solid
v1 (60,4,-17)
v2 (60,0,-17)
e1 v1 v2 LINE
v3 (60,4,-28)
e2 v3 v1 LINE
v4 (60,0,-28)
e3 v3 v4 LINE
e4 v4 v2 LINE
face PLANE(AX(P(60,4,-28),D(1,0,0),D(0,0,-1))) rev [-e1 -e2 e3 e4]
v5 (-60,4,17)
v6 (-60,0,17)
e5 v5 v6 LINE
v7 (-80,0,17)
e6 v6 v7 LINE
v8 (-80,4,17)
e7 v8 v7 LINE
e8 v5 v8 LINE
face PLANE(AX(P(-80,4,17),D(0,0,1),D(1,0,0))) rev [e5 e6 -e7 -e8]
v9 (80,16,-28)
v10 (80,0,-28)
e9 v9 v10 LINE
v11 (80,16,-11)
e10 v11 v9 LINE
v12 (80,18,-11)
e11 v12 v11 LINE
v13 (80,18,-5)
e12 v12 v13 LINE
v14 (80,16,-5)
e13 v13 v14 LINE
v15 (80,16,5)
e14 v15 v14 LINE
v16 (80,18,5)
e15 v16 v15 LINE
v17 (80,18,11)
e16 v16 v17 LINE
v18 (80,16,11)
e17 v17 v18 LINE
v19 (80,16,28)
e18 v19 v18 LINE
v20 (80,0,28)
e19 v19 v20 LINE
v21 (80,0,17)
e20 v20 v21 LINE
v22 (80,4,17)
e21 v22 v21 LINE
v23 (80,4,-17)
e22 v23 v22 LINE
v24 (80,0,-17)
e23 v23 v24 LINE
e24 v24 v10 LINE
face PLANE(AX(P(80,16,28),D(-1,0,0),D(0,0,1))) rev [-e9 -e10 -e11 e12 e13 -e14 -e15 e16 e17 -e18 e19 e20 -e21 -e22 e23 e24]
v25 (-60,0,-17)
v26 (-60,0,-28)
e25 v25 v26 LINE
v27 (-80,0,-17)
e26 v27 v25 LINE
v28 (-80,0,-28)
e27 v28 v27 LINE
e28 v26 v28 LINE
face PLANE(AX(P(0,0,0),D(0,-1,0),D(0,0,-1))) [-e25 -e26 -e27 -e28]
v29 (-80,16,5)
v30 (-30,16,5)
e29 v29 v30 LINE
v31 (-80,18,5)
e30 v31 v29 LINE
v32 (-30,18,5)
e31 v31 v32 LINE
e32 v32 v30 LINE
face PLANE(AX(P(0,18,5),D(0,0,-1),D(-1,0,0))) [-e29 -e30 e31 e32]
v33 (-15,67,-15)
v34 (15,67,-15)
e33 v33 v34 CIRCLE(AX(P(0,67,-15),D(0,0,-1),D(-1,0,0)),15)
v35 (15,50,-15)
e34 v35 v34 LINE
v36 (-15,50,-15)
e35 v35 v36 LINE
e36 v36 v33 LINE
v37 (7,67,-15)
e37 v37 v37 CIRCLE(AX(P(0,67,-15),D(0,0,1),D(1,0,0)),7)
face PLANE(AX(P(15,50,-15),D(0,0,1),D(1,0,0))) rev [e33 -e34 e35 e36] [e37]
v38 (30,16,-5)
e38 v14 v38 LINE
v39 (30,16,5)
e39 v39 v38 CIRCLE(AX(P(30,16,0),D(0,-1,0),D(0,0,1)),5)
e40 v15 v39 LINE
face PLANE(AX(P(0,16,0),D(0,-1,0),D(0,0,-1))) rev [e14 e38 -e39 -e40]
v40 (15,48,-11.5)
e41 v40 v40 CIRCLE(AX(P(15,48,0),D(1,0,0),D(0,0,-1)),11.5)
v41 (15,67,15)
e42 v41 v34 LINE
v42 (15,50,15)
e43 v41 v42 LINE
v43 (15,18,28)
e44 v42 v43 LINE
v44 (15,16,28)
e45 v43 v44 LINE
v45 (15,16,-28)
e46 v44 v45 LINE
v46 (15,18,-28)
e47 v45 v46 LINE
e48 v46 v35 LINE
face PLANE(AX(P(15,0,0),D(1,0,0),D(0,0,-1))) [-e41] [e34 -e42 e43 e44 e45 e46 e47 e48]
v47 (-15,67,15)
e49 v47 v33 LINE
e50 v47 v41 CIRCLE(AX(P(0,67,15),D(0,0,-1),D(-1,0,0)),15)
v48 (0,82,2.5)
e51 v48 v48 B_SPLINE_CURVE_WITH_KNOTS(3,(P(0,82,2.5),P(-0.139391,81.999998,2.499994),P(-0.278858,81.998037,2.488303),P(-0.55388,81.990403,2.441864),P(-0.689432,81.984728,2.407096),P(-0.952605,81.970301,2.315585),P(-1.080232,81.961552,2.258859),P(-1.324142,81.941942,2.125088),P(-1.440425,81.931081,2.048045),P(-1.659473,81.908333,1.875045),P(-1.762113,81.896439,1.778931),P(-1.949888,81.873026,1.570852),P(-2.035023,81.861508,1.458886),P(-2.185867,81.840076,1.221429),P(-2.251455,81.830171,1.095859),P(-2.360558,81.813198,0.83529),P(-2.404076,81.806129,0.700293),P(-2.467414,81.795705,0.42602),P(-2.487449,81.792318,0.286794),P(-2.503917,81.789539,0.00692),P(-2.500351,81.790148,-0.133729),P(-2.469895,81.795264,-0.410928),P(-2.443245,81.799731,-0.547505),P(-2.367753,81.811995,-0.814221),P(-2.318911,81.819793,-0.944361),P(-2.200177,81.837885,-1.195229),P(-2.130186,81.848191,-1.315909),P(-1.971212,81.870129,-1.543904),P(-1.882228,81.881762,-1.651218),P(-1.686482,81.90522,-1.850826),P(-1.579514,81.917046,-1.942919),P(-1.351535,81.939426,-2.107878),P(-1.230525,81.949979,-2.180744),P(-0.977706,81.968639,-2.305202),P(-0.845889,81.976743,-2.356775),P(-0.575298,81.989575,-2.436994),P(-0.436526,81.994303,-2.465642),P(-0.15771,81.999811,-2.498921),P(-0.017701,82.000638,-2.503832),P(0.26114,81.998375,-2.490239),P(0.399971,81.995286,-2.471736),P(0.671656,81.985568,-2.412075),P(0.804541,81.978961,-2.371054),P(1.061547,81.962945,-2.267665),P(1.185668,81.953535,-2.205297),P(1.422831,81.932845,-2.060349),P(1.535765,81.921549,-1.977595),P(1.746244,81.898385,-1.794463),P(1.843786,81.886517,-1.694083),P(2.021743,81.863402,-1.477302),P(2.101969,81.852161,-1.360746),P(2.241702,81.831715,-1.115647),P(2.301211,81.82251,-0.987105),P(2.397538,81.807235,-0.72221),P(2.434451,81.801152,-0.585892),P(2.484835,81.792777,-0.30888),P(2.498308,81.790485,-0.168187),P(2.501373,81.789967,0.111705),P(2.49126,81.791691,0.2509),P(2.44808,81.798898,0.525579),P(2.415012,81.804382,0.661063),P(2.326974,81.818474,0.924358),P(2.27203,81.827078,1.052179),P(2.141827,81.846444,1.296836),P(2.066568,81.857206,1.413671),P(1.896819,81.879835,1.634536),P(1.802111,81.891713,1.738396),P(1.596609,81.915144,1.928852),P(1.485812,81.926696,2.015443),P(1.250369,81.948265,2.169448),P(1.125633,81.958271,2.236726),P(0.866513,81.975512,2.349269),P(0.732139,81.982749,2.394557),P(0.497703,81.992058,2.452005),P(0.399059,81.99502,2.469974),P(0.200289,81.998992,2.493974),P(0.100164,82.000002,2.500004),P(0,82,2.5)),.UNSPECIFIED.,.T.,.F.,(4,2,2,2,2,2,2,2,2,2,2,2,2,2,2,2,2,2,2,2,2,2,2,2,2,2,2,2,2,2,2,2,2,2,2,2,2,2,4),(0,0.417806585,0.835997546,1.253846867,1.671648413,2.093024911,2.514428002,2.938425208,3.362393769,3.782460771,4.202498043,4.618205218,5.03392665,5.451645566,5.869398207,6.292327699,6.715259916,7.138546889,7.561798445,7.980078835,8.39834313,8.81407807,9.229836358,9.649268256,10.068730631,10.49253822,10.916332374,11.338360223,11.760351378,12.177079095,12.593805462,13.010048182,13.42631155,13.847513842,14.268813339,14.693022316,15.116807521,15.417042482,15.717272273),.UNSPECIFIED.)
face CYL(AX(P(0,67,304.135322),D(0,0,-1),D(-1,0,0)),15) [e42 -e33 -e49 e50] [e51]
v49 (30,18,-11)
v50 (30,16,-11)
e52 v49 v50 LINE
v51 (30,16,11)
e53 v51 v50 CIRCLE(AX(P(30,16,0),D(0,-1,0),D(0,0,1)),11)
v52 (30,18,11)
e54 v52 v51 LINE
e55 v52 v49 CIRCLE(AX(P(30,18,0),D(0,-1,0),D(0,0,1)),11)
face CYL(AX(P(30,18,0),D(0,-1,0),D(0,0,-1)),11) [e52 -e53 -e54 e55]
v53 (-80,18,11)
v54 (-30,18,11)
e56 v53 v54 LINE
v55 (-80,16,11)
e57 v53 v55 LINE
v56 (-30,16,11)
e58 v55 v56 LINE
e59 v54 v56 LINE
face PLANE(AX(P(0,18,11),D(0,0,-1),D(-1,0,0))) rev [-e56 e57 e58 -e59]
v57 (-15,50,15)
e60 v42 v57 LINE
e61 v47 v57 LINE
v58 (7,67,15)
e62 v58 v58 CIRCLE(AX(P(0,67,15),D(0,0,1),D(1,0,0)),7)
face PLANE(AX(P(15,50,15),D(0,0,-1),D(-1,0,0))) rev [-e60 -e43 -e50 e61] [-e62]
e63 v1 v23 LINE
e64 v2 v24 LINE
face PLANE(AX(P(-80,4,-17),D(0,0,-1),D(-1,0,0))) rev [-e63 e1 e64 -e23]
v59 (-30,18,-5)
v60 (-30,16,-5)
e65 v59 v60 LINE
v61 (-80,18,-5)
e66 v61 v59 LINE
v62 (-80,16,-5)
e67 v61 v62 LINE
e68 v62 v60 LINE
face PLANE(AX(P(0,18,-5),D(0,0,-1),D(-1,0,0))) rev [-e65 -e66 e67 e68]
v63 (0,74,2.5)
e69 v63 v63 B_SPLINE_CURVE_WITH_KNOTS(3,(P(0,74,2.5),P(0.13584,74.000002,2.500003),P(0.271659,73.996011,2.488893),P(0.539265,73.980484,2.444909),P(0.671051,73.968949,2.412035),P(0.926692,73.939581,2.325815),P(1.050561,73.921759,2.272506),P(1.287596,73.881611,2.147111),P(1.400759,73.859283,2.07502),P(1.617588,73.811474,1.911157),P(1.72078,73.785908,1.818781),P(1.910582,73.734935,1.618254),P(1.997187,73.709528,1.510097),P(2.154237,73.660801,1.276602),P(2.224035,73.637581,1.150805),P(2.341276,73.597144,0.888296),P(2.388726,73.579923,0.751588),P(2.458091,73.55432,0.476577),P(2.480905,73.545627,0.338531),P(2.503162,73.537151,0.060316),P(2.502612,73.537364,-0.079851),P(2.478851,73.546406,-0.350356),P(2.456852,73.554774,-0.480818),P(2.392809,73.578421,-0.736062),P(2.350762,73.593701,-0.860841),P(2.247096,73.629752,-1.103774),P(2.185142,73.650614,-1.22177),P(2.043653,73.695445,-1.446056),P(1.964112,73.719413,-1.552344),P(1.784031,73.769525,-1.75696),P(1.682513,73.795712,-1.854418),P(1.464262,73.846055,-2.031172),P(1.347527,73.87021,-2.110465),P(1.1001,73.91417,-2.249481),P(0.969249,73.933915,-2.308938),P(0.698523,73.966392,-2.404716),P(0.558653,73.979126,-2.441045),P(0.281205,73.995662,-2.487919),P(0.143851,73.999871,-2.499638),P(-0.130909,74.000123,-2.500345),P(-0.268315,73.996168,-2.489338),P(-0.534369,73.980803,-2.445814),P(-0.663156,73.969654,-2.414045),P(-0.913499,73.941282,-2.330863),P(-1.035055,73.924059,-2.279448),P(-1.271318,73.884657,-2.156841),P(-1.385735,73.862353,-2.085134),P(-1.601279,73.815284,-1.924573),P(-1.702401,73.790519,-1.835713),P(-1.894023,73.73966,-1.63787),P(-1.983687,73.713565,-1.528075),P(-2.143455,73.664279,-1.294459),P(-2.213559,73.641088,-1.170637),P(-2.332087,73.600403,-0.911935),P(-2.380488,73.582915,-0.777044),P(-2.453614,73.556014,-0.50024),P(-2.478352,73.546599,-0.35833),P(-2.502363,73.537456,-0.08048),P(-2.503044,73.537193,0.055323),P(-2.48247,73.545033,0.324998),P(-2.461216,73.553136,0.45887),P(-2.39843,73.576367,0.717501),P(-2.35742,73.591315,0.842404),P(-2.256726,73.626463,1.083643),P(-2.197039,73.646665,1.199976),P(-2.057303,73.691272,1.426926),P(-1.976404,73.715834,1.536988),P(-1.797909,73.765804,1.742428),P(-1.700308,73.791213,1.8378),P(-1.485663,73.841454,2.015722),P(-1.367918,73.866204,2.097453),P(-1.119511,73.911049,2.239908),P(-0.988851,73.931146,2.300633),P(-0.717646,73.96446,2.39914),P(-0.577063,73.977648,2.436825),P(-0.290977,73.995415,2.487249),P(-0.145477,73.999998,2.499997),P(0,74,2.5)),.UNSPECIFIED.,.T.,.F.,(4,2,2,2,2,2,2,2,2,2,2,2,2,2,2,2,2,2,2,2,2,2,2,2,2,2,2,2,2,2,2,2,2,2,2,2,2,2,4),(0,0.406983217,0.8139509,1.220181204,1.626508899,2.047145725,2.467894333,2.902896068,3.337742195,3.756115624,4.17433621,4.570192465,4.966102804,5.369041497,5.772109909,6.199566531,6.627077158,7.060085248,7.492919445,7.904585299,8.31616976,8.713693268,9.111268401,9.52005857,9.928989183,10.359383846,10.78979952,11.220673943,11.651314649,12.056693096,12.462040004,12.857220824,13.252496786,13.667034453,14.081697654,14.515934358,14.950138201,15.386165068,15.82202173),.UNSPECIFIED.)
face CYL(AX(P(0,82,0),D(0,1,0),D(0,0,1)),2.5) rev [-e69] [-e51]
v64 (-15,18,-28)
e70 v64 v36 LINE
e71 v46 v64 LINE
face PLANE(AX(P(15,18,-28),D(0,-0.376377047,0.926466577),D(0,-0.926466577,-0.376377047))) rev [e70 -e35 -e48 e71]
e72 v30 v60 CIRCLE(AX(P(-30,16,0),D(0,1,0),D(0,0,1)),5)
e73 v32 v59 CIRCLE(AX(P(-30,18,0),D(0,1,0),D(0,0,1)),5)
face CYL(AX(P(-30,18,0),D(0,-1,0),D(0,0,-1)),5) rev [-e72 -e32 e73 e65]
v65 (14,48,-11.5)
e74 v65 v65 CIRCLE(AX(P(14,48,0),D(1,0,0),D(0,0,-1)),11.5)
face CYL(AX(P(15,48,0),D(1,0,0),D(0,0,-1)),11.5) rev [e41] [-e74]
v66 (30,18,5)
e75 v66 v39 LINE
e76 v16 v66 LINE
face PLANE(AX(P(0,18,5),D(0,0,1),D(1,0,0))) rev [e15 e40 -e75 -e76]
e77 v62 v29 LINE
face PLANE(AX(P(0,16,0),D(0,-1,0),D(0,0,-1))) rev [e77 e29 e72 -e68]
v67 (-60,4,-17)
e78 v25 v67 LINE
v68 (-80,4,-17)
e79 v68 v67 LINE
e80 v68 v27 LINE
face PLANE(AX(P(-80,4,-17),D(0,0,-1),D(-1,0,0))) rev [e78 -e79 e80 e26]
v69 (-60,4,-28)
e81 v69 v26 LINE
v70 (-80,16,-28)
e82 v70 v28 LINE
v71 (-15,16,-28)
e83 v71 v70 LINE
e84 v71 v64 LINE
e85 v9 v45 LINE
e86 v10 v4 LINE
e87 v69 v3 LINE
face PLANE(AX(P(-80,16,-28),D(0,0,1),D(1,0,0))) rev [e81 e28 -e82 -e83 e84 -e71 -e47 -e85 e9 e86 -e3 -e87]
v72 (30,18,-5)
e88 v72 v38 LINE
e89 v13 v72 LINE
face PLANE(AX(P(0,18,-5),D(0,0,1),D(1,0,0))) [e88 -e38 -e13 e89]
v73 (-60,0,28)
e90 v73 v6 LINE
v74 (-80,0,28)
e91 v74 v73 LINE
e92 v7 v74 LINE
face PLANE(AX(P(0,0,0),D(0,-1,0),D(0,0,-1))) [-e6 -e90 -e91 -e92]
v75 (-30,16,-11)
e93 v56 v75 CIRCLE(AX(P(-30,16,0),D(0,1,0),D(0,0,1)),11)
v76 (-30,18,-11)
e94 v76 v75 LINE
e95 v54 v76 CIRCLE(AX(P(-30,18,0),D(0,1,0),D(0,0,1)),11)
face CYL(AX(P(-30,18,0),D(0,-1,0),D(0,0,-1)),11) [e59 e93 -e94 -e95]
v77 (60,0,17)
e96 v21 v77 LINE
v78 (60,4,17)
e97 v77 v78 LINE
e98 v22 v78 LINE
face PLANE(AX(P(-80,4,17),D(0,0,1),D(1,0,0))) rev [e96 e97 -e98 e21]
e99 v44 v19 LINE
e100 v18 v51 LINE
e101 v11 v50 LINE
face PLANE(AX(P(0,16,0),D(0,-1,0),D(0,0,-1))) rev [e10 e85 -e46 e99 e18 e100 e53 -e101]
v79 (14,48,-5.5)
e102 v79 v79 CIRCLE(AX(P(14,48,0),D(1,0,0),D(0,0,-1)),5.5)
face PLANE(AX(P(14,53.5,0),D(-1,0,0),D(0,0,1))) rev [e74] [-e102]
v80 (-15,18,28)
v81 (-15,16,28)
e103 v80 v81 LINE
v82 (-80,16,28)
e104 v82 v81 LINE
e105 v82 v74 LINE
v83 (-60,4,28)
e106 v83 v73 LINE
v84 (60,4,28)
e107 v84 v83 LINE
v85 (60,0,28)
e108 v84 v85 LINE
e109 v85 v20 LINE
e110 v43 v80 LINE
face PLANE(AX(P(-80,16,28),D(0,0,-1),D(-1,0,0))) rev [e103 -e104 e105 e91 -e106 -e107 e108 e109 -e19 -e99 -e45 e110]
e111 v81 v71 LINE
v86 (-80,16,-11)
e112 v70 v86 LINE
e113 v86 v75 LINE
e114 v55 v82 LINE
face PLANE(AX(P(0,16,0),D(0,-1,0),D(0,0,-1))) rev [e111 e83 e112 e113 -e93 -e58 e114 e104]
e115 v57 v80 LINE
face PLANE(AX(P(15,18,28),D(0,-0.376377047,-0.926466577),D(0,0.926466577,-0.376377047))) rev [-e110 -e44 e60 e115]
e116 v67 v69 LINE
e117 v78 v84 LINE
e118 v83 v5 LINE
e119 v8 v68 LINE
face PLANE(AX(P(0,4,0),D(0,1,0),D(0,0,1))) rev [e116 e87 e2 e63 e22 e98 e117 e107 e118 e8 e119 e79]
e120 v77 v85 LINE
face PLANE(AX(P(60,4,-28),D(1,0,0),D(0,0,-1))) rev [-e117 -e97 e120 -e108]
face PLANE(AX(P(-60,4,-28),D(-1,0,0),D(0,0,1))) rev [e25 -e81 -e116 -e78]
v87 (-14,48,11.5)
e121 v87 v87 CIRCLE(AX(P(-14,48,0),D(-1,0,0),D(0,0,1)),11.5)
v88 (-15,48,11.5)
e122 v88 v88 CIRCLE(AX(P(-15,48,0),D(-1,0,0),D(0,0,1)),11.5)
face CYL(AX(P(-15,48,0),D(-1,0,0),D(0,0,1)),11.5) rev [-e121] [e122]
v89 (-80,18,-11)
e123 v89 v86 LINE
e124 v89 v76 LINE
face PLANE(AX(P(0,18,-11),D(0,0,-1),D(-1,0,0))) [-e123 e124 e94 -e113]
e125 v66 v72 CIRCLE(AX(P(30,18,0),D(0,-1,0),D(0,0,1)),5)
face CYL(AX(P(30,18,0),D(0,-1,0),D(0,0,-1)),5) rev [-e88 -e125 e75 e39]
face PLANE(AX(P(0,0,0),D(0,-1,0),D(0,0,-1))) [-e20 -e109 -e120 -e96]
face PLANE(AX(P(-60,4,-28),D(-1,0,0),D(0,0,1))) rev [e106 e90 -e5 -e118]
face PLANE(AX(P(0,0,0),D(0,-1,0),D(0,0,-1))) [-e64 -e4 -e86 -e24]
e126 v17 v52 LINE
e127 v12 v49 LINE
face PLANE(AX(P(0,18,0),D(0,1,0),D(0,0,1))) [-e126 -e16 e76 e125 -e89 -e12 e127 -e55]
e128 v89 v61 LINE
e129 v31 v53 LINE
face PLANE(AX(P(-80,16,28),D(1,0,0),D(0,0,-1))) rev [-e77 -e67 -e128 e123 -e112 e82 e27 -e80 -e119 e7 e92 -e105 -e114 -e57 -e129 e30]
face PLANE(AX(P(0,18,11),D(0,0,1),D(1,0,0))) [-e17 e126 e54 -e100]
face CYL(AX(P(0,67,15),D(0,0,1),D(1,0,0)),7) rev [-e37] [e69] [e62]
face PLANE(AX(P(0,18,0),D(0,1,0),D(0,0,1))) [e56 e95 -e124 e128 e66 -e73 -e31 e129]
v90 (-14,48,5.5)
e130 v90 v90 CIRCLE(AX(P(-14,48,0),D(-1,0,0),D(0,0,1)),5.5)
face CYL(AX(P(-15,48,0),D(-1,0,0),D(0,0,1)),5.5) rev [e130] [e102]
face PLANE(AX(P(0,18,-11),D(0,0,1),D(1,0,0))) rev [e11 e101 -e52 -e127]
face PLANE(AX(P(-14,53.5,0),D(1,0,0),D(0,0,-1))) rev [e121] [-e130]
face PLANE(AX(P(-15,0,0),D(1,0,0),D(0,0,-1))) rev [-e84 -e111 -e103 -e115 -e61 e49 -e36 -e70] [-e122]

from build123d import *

# Parameters (mm, degrees)
SKETCH_1_W                  = 160
SKETCH_1_H                  = 56
EXTRUDE_1_DEPTH             = 16
SKETCH_2_W                  = 160
SKETCH_2_H                  = 34
CUT_EXTRUDE_1_DEPTH         = 4
SKETCH_3_W                  = 120
SKETCH_3_H                  = 56
CUT_EXTRUDE_2_DEPTH         = 4
EXTRUDE_2_DEPTH             = 2
EXTRUDE_3_DEPTH             = 15
CUT_EXTRUDE_START           = -30
CUT_EXTRUDE_3_DEPTH         = 30
HOLE_WIZARD_M16_1_D         = 14
HOLE_WIZARD_M6_1_REACH      = 119.932
HOLE_WIZARD_M6_1_BORE_R     = 2.5
HOLE_START                  = -15
HOLE_WIZARD_1_OUTLINE_R     = 5.5
HOLE_WIZARD_1_DEPTH         = 15
HOLE_WIZARD_1_2_OUTLINE_R   = 11.5
HOLE_WIZARD_1_2_OUTLINE_R_2 = 5.5
HOLE_WIZARD_1_2_DEPTH       = 1


# Read off the part's stored shape, not the designer's step: 切除-拉伸3, 孔1
with BuildPart() as part:
    # 草图1 → 凸台-拉伸1 (new body)
    with BuildSketch(Plane(origin=(0, 0, 0), x_dir=(1, 0, 0), z_dir=(0, 1, 0))):
        Rectangle(SKETCH_1_W, SKETCH_1_H)
    extrude(amount=EXTRUDE_1_DEPTH)

    # 草图2 → 切除-拉伸1 (cut)
    with BuildSketch(Plane.XZ):
        Rectangle(SKETCH_2_W, SKETCH_2_H)
    extrude(amount=-CUT_EXTRUDE_1_DEPTH, mode=Mode.SUBTRACT)

    # 草图3 → 切除-拉伸2 (cut)
    with BuildSketch(Plane.XZ):
        Rectangle(SKETCH_3_W, SKETCH_3_H)
    extrude(amount=-CUT_EXTRUDE_2_DEPTH, mode=Mode.SUBTRACT)

    # 草图4 → 凸台-拉伸2 (add)
    with BuildSketch(Plane(origin=(0, 16, 0), x_dir=(1, 0, 0), z_dir=(0, 1, 0))):
        with BuildLine():
            Line((-30, 11), (-80, 11))
            Line((-80, 11), (-80, 5))
            Line((-80, 5), (-30, 5))
            ThreePointArc((-30, 5), (-25, 0), (-30, -5))
            Line((-30, -5), (-80, -5))
            Line((-80, -5), (-80, -11))
            Line((-80, -11), (-30, -11))
            ThreePointArc((-30, -11), (-19, 0), (-30, 11))
        make_face()
    extrude_2 = extrude(amount=EXTRUDE_2_DEPTH)

    # 镜向1: 凸台-拉伸2 across plane
    add(extrude_2.mirror(Plane(origin=(0, 0, 0), x_dir=(0, 0, 1), z_dir=(1, 0, 0))))

    # 草图5 → 凸台-拉伸3 (add, symmetric)
    with BuildSketch(Plane(origin=(0, 0, 0), x_dir=(0, 0, -1), z_dir=(1, 0, 0))):
        Polygon((-28, 18), (-15, 50), (-15, 82), (15, 82), (15, 50), (28, 18), (28, 16), (-28, 16), align=None)
    extrude(amount=EXTRUDE_3_DEPTH, both=True)

    # 切除-拉伸3 outline → 切除-拉伸3 (cut)
    with BuildSketch(Plane.XY.offset(15).offset(CUT_EXTRUDE_START)):
        with BuildLine():
            Line((-15, 82), (-15, 67))
            ThreePointArc((-15, 67), (-10.606601718, 77.606601718), (0, 82))
            Line((0, 82), (-15, 82))
        make_face()
        with BuildLine():
            Line((15, 82), (0, 82))
            ThreePointArc((0, 82), (10.606601718, 77.606601718), (15, 67))
            Line((15, 67), (15, 82))
        make_face()
    extrude(amount=CUT_EXTRUDE_3_DEPTH, mode=Mode.SUBTRACT)

    # M16 螺纹孔1 (through all)
    with Locations(Plane.XY.offset(15)):
        with Locations((0, 67)):
            Hole(HOLE_WIZARD_M16_1_D / 2)

    # M6 螺纹孔1 bore → M6 螺纹孔1 (cut, up to next)
    with BuildSketch(Plane(origin=(0, 82, 0), x_dir=(1, 0, 0), z_dir=(0, 1, 0)), mode=Mode.PRIVATE) as hole_wizard_m6_1_sk1:
        Circle(HOLE_WIZARD_M6_1_BORE_R)
    hole_wizard_m6_1_tool1 = extrude(hole_wizard_m6_1_sk1.sketch, amount=-HOLE_WIZARD_M6_1_REACH, mode=Mode.PRIVATE) & part.part
    add(hole_wizard_m6_1_tool1.solids().sort_by_distance((0, 82, 0))[0], mode=Mode.SUBTRACT)

    # 孔1 outline → 孔1 (cut)
    with BuildSketch(Plane.YZ.offset(HOLE_START)):
        with Locations((48, 0)):
            Circle(HOLE_WIZARD_1_OUTLINE_R)
    hole_wizard_1 = extrude(amount=HOLE_WIZARD_1_DEPTH, mode=Mode.SUBTRACT)

    # Hole Wizard 1 2 outline → Hole Wizard 1 2 (cut)
    with BuildSketch(Plane.YZ.offset(HOLE_START)):
        with Locations((48, 0)):
            Circle(HOLE_WIZARD_1_2_OUTLINE_R)
        with Locations((48, 0)):
            Circle(HOLE_WIZARD_1_2_OUTLINE_R_2, mode=Mode.SUBTRACT)
    hole_wizard_1_2 = extrude(amount=HOLE_WIZARD_1_2_DEPTH, mode=Mode.SUBTRACT)

    # 镜向2: 孔1, Hole Wizard 1 2 across plane
    add(hole_wizard_1.mirror(Plane(origin=(0, 0, 0), x_dir=(0, 0, 1), z_dir=(1, 0, 0))), mode=Mode.SUBTRACT)
    add(hole_wizard_1_2.mirror(Plane(origin=(0, 0, 0), x_dir=(0, 0, 1), z_dir=(1, 0, 0))), mode=Mode.SUBTRACT)


solid = part.part
